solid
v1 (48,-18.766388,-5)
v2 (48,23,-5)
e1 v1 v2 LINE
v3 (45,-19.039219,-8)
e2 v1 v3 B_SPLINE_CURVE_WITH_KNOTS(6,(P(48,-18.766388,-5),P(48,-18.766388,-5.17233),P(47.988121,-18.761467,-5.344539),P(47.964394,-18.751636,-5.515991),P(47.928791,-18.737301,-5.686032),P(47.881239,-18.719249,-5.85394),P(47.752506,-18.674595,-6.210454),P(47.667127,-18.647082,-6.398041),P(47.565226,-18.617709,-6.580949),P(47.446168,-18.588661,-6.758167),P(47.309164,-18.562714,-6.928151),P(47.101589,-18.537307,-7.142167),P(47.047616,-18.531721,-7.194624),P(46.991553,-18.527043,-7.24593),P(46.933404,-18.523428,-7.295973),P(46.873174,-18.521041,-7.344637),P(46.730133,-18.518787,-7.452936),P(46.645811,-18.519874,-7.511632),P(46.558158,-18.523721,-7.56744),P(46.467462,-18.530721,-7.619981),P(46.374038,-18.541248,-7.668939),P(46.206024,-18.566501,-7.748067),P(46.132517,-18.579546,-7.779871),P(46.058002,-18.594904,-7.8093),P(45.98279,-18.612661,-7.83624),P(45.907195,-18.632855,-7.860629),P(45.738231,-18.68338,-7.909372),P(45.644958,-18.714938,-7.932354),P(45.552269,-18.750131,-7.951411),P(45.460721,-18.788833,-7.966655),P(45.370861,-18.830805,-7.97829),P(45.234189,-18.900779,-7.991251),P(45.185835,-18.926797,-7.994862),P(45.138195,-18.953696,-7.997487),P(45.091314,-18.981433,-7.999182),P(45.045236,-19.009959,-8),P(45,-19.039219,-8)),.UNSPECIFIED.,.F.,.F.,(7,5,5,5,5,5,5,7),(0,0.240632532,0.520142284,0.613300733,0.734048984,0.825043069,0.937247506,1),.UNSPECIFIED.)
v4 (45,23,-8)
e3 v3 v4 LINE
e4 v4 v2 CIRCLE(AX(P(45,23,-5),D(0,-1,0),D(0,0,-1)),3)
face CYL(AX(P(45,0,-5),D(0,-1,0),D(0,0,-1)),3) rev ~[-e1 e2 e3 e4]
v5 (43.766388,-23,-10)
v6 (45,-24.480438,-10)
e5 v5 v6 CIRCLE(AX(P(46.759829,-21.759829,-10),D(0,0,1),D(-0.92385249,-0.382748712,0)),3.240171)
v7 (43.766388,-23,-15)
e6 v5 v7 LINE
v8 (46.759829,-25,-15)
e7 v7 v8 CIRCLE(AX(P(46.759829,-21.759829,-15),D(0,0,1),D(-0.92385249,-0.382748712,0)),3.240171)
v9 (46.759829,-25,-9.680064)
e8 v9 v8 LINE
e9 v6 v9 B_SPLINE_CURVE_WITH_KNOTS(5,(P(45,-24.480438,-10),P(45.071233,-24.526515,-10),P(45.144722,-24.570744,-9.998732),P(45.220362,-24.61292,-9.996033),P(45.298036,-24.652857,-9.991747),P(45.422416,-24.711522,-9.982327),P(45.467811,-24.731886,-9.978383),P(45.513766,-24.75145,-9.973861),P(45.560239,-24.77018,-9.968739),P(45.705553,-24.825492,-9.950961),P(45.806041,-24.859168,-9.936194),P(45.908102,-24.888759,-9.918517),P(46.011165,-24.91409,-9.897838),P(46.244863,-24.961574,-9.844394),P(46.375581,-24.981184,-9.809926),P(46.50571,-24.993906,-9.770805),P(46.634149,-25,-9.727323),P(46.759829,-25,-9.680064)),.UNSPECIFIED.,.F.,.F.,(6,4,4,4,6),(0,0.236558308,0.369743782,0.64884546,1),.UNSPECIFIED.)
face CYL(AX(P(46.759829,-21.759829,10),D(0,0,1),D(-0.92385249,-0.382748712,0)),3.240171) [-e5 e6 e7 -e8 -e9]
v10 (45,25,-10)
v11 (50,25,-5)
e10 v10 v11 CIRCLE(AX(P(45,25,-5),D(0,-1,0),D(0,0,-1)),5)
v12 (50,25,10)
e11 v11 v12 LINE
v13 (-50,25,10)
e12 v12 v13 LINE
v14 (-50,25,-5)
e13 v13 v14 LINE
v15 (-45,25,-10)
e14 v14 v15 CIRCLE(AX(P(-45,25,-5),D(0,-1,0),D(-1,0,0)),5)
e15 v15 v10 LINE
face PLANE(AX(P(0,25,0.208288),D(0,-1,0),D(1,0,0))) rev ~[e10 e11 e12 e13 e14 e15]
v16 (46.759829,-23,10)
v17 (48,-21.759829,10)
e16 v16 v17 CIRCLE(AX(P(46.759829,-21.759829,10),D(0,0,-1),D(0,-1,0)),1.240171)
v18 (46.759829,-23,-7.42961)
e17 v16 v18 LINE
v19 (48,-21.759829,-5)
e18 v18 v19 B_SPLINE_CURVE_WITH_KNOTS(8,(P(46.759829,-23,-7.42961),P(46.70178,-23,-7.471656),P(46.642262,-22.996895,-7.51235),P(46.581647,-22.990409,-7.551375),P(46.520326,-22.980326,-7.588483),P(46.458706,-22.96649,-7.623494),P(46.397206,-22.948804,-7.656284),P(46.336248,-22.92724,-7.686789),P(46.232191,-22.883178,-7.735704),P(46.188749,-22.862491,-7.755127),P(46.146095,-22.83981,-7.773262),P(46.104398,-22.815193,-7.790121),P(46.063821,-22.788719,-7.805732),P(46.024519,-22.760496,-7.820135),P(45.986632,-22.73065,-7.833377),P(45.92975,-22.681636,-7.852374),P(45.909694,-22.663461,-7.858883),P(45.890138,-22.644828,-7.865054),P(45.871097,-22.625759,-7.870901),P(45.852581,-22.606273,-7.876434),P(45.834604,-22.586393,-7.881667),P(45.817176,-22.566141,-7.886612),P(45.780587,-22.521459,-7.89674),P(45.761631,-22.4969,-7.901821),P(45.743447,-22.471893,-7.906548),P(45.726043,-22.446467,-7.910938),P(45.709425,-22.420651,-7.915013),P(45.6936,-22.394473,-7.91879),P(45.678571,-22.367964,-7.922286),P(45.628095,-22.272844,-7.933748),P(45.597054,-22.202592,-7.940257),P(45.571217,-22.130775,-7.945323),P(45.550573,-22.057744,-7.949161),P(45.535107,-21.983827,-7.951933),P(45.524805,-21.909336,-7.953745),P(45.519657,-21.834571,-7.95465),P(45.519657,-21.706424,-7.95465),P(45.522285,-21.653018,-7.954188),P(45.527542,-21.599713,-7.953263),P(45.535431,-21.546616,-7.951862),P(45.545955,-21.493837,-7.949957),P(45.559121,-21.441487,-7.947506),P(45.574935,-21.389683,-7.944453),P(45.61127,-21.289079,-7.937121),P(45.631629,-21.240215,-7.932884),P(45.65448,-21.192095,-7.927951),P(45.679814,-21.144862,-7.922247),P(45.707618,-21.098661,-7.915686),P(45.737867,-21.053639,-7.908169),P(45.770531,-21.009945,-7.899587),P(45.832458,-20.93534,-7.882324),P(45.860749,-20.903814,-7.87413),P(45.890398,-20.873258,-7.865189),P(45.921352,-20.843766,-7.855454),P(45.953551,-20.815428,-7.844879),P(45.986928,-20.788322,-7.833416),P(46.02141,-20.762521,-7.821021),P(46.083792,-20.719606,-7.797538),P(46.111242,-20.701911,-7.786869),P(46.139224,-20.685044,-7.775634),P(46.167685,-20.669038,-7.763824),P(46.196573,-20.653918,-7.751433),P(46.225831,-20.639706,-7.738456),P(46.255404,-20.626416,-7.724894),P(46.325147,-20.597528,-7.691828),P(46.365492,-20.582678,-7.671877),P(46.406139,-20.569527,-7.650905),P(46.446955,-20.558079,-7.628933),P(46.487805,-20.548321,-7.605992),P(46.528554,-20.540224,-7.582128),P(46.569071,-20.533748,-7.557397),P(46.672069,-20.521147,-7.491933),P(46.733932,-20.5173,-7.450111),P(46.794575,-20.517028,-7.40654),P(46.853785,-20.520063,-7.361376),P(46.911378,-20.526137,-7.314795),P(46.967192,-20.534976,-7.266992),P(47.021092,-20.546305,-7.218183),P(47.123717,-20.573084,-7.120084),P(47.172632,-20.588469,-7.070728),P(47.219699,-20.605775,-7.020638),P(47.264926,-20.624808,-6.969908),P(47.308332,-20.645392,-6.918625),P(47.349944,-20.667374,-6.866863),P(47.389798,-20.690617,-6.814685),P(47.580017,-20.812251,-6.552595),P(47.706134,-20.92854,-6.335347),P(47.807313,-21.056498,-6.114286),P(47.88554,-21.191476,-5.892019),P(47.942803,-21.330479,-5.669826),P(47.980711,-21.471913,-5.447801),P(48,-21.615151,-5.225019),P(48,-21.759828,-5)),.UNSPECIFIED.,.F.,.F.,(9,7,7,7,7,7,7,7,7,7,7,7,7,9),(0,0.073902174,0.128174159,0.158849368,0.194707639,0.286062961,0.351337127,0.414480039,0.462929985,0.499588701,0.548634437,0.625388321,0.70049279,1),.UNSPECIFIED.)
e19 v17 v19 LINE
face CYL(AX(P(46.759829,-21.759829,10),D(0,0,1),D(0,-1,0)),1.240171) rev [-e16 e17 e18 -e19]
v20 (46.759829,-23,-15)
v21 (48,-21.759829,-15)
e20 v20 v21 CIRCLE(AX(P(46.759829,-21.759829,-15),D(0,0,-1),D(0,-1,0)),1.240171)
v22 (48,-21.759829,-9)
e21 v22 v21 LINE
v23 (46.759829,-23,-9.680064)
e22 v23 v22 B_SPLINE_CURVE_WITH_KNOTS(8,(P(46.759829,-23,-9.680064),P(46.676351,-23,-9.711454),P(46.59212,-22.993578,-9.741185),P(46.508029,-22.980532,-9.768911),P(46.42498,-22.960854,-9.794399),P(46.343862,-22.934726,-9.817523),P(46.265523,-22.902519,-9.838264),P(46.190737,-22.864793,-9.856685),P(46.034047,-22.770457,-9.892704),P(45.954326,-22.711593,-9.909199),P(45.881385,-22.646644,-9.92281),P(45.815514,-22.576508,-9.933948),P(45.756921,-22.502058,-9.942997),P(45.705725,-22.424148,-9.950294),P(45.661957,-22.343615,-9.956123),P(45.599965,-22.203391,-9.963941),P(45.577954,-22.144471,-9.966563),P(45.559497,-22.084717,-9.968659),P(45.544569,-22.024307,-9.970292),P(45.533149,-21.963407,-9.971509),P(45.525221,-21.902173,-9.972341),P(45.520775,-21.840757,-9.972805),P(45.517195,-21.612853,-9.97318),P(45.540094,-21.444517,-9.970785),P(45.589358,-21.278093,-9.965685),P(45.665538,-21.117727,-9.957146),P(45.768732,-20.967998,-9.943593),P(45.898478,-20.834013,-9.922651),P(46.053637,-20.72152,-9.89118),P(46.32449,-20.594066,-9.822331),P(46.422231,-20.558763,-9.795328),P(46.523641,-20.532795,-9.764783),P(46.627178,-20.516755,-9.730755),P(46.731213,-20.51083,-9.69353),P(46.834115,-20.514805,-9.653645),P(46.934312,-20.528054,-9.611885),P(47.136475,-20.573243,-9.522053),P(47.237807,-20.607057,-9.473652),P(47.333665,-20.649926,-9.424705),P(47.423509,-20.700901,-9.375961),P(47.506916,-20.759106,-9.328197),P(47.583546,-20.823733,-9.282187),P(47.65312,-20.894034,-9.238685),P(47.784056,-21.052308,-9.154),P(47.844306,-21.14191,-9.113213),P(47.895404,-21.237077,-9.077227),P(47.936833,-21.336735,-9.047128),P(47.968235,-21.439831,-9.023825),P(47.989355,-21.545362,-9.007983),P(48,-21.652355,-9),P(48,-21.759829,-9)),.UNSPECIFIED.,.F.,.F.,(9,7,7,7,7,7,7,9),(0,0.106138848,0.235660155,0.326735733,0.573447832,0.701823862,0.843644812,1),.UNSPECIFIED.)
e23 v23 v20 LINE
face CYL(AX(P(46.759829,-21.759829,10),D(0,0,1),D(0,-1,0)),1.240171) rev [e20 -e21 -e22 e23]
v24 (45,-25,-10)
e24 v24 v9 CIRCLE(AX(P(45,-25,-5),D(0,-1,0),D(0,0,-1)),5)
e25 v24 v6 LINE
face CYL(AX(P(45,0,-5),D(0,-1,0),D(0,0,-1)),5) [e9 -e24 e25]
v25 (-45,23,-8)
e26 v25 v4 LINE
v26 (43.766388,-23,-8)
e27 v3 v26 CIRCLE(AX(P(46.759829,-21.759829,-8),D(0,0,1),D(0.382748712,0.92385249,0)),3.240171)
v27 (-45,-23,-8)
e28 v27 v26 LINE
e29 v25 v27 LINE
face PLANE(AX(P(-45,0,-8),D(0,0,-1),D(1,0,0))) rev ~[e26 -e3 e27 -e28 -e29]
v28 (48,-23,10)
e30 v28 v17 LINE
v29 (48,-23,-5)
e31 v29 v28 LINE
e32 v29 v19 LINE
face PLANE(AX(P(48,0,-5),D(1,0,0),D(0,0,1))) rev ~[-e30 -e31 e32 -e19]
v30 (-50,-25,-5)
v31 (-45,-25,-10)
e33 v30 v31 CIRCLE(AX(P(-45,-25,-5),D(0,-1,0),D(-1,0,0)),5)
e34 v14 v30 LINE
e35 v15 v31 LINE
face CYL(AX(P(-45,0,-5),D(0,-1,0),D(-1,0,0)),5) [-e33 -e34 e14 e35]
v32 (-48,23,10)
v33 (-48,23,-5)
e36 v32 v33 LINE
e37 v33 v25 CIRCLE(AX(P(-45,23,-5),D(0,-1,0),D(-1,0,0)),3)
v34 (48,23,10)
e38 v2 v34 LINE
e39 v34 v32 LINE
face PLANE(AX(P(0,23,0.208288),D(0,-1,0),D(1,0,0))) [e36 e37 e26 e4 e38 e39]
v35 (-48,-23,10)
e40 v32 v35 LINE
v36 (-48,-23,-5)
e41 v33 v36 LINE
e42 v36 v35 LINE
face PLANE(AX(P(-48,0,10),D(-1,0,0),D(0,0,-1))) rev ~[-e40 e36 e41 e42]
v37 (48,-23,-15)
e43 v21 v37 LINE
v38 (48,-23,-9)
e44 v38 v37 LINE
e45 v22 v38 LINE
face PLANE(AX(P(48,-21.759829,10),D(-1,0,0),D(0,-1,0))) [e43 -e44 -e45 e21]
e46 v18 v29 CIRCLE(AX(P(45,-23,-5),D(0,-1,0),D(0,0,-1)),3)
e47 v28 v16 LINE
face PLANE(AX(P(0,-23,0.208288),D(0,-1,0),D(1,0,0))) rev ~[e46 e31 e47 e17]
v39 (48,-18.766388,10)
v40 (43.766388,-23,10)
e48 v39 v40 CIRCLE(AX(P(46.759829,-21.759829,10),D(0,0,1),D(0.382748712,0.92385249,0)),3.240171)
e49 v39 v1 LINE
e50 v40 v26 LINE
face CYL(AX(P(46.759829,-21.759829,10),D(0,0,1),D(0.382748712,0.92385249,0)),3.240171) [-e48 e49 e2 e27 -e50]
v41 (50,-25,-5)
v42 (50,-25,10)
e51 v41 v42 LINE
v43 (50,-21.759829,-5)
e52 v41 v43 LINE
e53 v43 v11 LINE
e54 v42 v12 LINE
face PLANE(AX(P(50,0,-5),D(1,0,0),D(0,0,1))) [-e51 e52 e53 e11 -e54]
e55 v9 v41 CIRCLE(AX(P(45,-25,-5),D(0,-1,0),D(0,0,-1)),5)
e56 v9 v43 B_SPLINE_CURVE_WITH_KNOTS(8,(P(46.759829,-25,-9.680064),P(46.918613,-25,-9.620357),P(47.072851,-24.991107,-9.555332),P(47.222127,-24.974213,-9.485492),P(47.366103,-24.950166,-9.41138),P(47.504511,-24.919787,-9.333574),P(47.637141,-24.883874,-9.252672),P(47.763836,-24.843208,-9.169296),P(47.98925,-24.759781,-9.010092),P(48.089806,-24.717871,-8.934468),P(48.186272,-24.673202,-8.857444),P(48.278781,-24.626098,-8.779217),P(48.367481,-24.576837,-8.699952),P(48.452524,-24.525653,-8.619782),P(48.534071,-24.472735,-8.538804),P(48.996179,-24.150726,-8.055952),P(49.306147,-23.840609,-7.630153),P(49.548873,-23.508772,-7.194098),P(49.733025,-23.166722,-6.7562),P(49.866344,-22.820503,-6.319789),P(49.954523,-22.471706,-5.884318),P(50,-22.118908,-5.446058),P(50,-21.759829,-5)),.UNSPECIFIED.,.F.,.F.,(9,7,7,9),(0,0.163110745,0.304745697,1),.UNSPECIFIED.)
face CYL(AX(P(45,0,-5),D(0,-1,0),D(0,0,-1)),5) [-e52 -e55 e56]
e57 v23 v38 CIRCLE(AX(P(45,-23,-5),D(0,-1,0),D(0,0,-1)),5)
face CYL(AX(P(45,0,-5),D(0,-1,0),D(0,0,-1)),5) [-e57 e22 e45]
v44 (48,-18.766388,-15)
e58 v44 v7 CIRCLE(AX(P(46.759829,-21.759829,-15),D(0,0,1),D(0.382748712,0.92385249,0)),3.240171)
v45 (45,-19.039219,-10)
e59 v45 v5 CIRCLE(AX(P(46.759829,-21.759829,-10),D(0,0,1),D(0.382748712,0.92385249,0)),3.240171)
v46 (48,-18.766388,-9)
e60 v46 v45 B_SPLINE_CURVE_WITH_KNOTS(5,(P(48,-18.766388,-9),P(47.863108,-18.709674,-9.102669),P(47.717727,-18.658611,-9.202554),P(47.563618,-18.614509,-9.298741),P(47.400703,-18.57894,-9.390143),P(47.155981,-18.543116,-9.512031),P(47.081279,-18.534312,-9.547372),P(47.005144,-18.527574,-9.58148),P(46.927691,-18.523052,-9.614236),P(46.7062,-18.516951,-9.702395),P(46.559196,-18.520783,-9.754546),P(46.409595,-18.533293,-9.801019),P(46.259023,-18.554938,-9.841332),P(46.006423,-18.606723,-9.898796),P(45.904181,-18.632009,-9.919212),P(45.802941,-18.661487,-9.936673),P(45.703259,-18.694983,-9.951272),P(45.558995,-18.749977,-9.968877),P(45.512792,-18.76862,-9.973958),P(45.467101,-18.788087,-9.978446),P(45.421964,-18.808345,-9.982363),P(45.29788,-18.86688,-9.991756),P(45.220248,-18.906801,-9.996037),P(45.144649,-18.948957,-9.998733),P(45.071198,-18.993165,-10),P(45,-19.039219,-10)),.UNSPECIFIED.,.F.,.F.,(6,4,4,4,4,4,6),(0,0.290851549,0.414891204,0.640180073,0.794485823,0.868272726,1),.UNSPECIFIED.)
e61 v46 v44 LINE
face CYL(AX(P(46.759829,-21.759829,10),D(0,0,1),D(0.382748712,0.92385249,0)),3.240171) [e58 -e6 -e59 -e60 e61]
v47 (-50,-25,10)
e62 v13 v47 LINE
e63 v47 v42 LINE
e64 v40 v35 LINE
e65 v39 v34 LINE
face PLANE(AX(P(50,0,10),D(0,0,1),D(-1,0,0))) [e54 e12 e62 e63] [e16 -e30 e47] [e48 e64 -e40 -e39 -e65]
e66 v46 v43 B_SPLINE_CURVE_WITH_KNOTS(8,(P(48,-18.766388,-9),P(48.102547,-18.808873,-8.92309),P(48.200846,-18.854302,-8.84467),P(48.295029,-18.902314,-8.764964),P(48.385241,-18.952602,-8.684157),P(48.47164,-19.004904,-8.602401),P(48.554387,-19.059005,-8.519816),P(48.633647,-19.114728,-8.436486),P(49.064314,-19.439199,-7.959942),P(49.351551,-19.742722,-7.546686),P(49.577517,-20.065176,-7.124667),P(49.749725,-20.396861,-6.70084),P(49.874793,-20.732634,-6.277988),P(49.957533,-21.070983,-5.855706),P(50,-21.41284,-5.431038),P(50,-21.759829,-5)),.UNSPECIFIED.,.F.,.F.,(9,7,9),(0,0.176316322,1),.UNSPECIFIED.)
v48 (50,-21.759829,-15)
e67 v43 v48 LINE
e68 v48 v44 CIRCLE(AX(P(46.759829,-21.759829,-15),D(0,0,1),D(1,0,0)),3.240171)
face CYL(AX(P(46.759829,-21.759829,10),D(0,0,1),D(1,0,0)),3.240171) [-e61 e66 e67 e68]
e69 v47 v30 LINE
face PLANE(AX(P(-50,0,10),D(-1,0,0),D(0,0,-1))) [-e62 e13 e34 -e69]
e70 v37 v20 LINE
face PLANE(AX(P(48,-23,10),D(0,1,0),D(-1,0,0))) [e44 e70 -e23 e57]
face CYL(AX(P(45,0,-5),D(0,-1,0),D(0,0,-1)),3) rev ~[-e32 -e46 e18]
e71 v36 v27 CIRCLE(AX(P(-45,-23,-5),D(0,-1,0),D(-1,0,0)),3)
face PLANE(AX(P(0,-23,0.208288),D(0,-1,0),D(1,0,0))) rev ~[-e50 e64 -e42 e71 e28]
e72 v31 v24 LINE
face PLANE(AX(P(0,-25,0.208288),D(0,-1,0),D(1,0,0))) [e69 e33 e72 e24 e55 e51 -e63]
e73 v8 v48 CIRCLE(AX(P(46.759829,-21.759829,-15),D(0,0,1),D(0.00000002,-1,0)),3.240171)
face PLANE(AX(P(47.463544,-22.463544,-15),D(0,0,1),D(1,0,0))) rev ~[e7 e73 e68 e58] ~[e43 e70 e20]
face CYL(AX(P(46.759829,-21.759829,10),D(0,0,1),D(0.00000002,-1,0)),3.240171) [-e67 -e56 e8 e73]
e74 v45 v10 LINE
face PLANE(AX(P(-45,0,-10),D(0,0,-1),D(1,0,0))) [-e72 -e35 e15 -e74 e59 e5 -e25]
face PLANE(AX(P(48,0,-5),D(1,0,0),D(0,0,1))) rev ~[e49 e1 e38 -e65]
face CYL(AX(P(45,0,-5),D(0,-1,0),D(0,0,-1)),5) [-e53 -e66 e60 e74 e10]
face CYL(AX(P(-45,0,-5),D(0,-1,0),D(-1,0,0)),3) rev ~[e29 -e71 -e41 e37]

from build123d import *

# Parameters (mm, degrees)
F1_DEPTH = 25
F2_T     = -2
F4_DEPTH = 25


with BuildPart() as f1:
    # F0 (on Front) → F1 (new body, symmetric)
    with BuildSketch(Plane.XZ):
        with BuildLine():
            Line((50, 10), (-50, 10))
            Line((-50, 10), (-50, -5))
            ThreePointArc((-50, -5), (-48.5355339059, -8.5355339059), (-45, -10))
            Line((-45, -10), (45, -10))
            ThreePointArc((45, -10), (48.5355339059, -8.5355339059), (50, -5))
            Line((50, -5), (50, 10))
        make_face()
    extrude(amount=F1_DEPTH, both=True)

    # F2
    f2_openings = [f1.faces().sort_by_distance(p)[0] for p in [
        (0, 0, 10),
    ]]
    offset(amount=F2_T, openings=f2_openings)

    # F3 (on face) → F4 (join)
    with BuildSketch(Plane.XY.offset(10)):
        with BuildLine():
            Line((48, -18.7663880923), (48, -21.7598285526))
            Line((48, -21.7598285526), (48, -23))
            Line((48, -23), (46.7598285526, -23))
            Line((46.7598285526, -23), (43.7663880923, -23))
            ThreePointArc((43.7663880923, -23), (44.9597809557, -24.4539962641), (46.7598286169, -25))
            ThreePointArc((46.7598286169, -25), (49.050975778, -24.0509757325), (50, -21.7598285526))
            ThreePointArc((50, -21.7598285526), (49.4539962462, -19.959780929), (48, -18.7663880923))
        make_face()
        with BuildLine():
            ThreePointArc((46.7598285526, -23), (45.8828949123, -20.8828949123), (48, -21.7598285526))
            Line((48, -21.7598285526), (48, -18.7663880923))
            ThreePointArc((48, -18.7663880923), (44.4686813499, -19.4686813499), (43.7663880923, -23))
            Line((43.7663880923, -23), (46.7598285526, -23))
        make_face()
    extrude(amount=-F4_DEPTH)


solid = f1.part
